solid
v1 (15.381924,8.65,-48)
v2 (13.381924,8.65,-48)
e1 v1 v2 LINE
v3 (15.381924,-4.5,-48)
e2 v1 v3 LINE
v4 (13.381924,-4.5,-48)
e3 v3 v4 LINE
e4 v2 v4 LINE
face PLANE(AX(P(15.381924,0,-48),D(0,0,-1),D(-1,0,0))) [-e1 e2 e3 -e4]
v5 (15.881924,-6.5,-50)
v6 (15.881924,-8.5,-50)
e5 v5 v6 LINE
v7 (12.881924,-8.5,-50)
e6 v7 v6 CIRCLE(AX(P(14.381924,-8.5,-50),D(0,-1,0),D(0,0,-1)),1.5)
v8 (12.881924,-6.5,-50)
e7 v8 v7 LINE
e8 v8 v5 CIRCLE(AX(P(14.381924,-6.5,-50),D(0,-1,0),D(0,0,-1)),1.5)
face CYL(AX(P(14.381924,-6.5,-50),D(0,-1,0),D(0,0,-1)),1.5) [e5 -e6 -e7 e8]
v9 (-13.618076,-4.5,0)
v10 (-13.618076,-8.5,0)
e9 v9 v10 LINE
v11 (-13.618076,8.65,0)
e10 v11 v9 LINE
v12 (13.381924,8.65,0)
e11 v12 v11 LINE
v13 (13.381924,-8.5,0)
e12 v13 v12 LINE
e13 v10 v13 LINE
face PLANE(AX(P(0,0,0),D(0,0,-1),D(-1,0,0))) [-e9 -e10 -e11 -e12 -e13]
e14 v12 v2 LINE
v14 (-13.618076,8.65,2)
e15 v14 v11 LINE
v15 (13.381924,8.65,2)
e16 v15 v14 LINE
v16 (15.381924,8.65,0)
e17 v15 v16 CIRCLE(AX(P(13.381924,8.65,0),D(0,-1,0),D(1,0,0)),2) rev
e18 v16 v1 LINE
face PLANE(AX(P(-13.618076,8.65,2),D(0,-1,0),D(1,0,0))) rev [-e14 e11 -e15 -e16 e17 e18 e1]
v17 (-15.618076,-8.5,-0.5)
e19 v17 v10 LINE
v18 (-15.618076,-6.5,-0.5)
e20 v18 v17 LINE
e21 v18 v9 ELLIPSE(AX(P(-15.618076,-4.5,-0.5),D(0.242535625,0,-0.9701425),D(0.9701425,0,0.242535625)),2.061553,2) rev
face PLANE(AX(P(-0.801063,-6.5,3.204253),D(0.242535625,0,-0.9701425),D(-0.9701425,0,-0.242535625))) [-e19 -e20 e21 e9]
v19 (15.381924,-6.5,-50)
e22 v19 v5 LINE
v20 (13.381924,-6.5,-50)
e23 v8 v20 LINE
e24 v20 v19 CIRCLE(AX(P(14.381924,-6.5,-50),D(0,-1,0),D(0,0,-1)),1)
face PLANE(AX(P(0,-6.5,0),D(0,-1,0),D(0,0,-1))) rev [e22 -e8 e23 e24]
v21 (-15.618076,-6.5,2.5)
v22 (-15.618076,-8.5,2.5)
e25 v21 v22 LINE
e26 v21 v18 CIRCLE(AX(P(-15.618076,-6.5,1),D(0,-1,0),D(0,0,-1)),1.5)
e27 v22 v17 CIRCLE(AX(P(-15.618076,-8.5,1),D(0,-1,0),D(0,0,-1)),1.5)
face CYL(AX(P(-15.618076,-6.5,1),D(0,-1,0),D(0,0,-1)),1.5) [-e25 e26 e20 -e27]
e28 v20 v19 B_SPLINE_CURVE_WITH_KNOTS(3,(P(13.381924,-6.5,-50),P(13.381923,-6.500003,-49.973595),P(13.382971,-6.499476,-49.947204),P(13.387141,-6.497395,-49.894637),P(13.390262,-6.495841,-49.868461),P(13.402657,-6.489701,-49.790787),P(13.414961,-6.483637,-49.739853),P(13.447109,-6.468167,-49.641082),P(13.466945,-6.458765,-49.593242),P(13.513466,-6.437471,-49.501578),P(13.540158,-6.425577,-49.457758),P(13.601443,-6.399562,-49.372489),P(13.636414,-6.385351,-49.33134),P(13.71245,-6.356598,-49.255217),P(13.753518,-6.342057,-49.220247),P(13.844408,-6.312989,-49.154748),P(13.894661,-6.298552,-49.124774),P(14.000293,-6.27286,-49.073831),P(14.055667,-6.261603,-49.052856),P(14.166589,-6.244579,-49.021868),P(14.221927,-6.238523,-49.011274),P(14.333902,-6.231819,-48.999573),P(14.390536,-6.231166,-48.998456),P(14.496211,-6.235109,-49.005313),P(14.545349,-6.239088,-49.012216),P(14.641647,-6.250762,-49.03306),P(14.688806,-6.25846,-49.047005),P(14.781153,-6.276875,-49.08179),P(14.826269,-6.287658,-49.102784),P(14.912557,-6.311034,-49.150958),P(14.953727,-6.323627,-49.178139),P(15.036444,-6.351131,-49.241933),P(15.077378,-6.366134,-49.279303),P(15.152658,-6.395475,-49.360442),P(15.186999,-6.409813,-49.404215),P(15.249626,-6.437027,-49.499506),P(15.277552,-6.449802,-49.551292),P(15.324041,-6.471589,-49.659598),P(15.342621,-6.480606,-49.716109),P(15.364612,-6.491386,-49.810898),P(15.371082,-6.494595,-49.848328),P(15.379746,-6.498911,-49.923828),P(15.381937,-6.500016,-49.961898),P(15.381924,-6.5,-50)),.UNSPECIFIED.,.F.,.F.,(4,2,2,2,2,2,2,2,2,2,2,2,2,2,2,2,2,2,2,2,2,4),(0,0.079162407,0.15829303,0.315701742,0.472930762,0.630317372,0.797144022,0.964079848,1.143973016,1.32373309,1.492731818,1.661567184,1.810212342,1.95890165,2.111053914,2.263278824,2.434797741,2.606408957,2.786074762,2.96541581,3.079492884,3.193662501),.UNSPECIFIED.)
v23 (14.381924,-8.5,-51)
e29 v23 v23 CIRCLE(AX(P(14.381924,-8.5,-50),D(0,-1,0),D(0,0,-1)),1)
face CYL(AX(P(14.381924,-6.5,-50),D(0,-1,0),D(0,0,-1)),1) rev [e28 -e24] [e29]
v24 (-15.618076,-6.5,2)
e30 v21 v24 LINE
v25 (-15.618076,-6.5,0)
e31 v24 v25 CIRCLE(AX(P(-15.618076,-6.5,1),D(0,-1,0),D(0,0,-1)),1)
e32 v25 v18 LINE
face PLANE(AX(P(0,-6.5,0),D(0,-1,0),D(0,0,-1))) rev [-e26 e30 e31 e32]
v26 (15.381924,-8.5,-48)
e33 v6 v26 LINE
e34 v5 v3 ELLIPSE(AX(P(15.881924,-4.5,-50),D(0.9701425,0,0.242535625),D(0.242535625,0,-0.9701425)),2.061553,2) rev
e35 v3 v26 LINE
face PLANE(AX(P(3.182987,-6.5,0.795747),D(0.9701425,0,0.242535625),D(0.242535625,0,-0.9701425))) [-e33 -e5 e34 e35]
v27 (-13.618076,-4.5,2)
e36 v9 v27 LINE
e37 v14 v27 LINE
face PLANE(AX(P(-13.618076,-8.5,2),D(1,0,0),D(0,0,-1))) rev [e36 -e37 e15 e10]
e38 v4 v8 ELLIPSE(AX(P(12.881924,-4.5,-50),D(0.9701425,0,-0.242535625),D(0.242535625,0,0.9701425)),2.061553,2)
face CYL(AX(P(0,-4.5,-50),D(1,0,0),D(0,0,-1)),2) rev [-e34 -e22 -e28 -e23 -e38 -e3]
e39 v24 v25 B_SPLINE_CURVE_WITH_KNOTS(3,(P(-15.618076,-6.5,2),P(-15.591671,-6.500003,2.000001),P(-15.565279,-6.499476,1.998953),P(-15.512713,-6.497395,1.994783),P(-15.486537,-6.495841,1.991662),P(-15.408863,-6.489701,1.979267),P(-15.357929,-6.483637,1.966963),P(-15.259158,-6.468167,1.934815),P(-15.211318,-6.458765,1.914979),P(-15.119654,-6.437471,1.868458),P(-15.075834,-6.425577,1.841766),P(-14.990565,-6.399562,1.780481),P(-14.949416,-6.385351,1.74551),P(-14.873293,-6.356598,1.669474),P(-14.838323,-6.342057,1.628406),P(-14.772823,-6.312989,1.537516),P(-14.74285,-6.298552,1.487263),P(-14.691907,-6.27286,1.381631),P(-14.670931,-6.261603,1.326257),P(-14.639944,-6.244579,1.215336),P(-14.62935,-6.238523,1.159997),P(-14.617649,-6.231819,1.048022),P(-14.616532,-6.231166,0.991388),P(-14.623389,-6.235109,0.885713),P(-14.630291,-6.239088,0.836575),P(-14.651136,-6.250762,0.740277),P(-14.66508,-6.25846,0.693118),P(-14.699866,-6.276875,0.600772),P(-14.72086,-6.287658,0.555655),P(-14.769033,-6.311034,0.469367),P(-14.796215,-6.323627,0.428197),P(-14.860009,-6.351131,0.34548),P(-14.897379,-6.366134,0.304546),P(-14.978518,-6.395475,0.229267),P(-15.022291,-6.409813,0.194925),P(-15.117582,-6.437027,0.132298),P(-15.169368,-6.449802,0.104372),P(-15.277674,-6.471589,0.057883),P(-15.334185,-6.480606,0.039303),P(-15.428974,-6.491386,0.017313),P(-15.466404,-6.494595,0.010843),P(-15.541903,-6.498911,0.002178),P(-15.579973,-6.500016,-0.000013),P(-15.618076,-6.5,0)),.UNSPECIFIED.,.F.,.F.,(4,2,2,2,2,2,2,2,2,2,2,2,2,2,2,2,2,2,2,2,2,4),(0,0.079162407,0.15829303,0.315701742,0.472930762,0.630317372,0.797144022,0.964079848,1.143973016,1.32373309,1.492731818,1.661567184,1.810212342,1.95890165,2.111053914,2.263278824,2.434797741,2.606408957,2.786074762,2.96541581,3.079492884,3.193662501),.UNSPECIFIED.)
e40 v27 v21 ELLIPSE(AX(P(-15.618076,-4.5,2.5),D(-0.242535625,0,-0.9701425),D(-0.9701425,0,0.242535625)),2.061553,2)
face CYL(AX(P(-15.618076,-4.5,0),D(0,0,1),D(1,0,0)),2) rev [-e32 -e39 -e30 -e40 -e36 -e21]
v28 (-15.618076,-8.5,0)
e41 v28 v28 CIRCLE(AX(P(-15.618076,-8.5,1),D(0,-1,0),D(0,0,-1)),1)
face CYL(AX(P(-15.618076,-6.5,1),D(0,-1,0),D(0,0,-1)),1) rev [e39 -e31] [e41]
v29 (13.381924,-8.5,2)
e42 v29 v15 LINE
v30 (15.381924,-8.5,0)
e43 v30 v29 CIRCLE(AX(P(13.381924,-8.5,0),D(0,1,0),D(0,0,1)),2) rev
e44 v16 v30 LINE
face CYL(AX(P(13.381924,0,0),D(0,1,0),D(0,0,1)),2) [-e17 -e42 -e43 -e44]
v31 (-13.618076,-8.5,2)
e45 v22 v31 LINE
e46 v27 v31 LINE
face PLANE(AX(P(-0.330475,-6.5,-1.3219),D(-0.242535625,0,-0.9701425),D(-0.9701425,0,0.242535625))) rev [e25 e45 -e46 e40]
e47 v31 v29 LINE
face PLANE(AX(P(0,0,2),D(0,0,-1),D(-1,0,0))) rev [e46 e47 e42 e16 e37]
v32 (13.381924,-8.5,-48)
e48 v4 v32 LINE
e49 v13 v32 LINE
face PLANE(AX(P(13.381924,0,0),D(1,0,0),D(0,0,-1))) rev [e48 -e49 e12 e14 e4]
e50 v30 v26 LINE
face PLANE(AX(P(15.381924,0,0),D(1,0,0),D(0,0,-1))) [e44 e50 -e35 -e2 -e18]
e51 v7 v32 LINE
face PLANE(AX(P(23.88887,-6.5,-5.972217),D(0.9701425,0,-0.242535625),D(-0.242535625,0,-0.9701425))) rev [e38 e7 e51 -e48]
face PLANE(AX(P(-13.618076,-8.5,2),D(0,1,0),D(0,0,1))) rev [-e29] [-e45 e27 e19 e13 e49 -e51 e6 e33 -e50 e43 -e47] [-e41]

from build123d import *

# Parameters (mm, degrees)
SKETCH2_W           = 27
SKETCH2_H           = 17.15
BOSS_EXTRUDE1_DEPTH = 2
SKETCH3_W           = 48
SKETCH3_H           = 17.15
SKETCH3_W_2         = 2
BOSS_EXTRUDE2_DEPTH = 2
FILLET1_R           = 2
SKETCH4_R           = 1
BOSS_EXTRUDE3_DEPTH = 2
FILLET2_R           = 2


with BuildPart() as part:
    # Sketch2 → Boss-Extrude1 (new body)
    with BuildSketch(Plane.XY):
        with Locations((-0.118075802, 0.075)):
            Rectangle(SKETCH2_W, SKETCH2_H)
    extrude(amount=BOSS_EXTRUDE1_DEPTH)

    # Sketch3 → Boss-Extrude2 (add)
    with BuildSketch(Plane(origin=(13.381924198, 0, 0), x_dir=(0, 0, -1), z_dir=(1, 0, 0))):
        with Locations((24, 0.075)):
            Rectangle(SKETCH3_W, SKETCH3_H)
        with Locations((-1, 0.075)):
            Rectangle(SKETCH3_W_2, SKETCH3_H)
    extrude(amount=BOSS_EXTRUDE2_DEPTH)

    # Fillet1
    fillet1_edges = [part.edges().sort_by_distance(p)[0] for p in [
        (15.381924198, 0.075, 2),
    ]]
    fillet(fillet1_edges, radius=FILLET1_R)

    # Sketch4 → Boss-Extrude3 (add)
    # profile 1 of 4: a face of its own
    with BuildSketch(Plane.XZ.offset(8.5)):
        with BuildLine():
            Line((13.381924198, -48), (13.058394786, -49.294117647))
            ThreePointArc((13.058394786, -49.294117647), (14.381924198, -48.5), (15.70545361, -49.294117647))
            Line((15.70545361, -49.294117647), (15.381924198, -48))
            Line((15.381924198, -48), (13.381924198, -48))
        make_face()
    # profile 2 of 4: a face of its own
    with BuildSketch(Plane.XZ.offset(8.5)):
        with BuildLine():
            Line((13.058394786, -49.294117647), (12.881924198, -50))
            ThreePointArc((12.881924198, -50), (14.381924198, -51.5), (15.881924198, -50))
            Line((15.881924198, -50), (15.70545361, -49.294117647))
            ThreePointArc((15.70545361, -49.294117647), (14.381924198, -48.5), (13.058394786, -49.294117647))
        make_face()
        with Locations(Location((14.381924198, -50, 0), (0, 0, 270))):
            Circle(SKETCH4_R, mode=Mode.SUBTRACT)
    # profile 3 of 4: a face of its own
    with BuildSketch(Plane.XZ.offset(8.5)):
        with BuildLine():
            Line((-15.618075802, -0.5), (-14.912193449, -0.323529412))
            ThreePointArc((-14.912193449, -0.323529412), (-14.331836413, 0.228256367), (-14.118075802, 1))
            ThreePointArc((-14.118075802, 1), (-14.331836413, 1.771743633), (-14.912193449, 2.323529412))
            Line((-14.912193449, 2.323529412), (-15.618075802, 2.5))
            ThreePointArc((-15.618075802, 2.5), (-17.118075802, 1), (-15.618075802, -0.5))
        make_face()
        with Locations(Location((-15.618075802, 1, 0), (0, 0, 270))):
            Circle(SKETCH4_R, mode=Mode.SUBTRACT)
    # profile 4 of 4: a face of its own
    with BuildSketch(Plane.XZ.offset(8.5)):
        with BuildLine():
            Line((-14.912193449, -0.323529412), (-13.618075802, 0))
            Line((-13.618075802, 0), (-13.618075802, 2))
            Line((-13.618075802, 2), (-14.912193449, 2.323529412))
            ThreePointArc((-14.912193449, 2.323529412), (-14.331836413, 1.771743633), (-14.118075802, 1))
            ThreePointArc((-14.118075802, 1), (-14.331836413, 0.228256367), (-14.912193449, -0.323529412))
        make_face()
    extrude(amount=-BOSS_EXTRUDE3_DEPTH)

    # Fillet2
    # the kernel refuses this fillet: 2 mm, written as the material it adds along each edge
    with BuildSketch(Plane(origin=(-13.618075802, -6.5, -5), x_dir=(0, 1, 0), z_dir=(0, 0, 1))) as fillet2_piece_1_section:
        with BuildLine():
            CenterArc((FILLET2_R, FILLET2_R), FILLET2_R, 180, 90)
            Line((0, FILLET2_R), (0, 0))
            Line((0, 0), (FILLET2_R, 0))
        make_face()
    fillet2_piece_1 = extrude(amount=12, mode=Mode.PRIVATE)
    fillet2_piece_1 = split(fillet2_piece_1, bisect_by=Plane(origin=(-13.669858881, -6.170840666, 2.01294577), z_dir=(-0.24253562503633297, 0, -0.9701425001453319)), keep=Keep.TOP, mode=Mode.PRIVATE)
    fillet2_piece_1 = split(fillet2_piece_1, bisect_by=Plane(origin=(-14.177655248, -6.170840666, -0.139894862), z_dir=(-0.24253562503633314, 0, 0.9701425001453319)), keep=Keep.TOP, mode=Mode.PRIVATE)
    fillet2_piece_1 = fillet2_piece_1 - Plane(origin=(-15.618075802, -6.170840666, 1), x_dir=(0, 0, -1), z_dir=(0, -1, 0)) * Cylinder(1, 32, mode=Mode.PRIVATE)
    add(fillet2_piece_1)
    with BuildSketch(Plane(origin=(20.381924198, -6.5, -48), x_dir=(0, 1, 0), z_dir=(-1, 0, 0))) as fillet2_piece_2_section:
        with BuildLine():
            CenterArc((FILLET2_R, FILLET2_R), FILLET2_R, 180, 90)
            Line((0, FILLET2_R), (0, 0))
            Line((0, 0), (FILLET2_R, 0))
        make_face()
    fillet2_piece_2 = extrude(amount=12, mode=Mode.PRIVATE)
    fillet2_piece_2 = split(fillet2_piece_2, bisect_by=Plane(origin=(15.52181906, -6.170840666, -48.559579447), z_dir=(-0.9701425001453322, 0, -0.24253562503633172)), keep=Keep.TOP, mode=Mode.PRIVATE)
    fillet2_piece_2 = split(fillet2_piece_2, bisect_by=Plane(origin=(13.368978429, -6.170840666, -48.051783079), z_dir=(0.9701425001453319, 0, -0.24253562503633297)), keep=Keep.TOP, mode=Mode.PRIVATE)
    fillet2_piece_2 = fillet2_piece_2 - Plane(origin=(14.381924198, -6.170840666, -50), x_dir=(0, 0, -1), z_dir=(0, -1, 0)) * Cylinder(1, 32, mode=Mode.PRIVATE)
    add(fillet2_piece_2)


solid = part.part
